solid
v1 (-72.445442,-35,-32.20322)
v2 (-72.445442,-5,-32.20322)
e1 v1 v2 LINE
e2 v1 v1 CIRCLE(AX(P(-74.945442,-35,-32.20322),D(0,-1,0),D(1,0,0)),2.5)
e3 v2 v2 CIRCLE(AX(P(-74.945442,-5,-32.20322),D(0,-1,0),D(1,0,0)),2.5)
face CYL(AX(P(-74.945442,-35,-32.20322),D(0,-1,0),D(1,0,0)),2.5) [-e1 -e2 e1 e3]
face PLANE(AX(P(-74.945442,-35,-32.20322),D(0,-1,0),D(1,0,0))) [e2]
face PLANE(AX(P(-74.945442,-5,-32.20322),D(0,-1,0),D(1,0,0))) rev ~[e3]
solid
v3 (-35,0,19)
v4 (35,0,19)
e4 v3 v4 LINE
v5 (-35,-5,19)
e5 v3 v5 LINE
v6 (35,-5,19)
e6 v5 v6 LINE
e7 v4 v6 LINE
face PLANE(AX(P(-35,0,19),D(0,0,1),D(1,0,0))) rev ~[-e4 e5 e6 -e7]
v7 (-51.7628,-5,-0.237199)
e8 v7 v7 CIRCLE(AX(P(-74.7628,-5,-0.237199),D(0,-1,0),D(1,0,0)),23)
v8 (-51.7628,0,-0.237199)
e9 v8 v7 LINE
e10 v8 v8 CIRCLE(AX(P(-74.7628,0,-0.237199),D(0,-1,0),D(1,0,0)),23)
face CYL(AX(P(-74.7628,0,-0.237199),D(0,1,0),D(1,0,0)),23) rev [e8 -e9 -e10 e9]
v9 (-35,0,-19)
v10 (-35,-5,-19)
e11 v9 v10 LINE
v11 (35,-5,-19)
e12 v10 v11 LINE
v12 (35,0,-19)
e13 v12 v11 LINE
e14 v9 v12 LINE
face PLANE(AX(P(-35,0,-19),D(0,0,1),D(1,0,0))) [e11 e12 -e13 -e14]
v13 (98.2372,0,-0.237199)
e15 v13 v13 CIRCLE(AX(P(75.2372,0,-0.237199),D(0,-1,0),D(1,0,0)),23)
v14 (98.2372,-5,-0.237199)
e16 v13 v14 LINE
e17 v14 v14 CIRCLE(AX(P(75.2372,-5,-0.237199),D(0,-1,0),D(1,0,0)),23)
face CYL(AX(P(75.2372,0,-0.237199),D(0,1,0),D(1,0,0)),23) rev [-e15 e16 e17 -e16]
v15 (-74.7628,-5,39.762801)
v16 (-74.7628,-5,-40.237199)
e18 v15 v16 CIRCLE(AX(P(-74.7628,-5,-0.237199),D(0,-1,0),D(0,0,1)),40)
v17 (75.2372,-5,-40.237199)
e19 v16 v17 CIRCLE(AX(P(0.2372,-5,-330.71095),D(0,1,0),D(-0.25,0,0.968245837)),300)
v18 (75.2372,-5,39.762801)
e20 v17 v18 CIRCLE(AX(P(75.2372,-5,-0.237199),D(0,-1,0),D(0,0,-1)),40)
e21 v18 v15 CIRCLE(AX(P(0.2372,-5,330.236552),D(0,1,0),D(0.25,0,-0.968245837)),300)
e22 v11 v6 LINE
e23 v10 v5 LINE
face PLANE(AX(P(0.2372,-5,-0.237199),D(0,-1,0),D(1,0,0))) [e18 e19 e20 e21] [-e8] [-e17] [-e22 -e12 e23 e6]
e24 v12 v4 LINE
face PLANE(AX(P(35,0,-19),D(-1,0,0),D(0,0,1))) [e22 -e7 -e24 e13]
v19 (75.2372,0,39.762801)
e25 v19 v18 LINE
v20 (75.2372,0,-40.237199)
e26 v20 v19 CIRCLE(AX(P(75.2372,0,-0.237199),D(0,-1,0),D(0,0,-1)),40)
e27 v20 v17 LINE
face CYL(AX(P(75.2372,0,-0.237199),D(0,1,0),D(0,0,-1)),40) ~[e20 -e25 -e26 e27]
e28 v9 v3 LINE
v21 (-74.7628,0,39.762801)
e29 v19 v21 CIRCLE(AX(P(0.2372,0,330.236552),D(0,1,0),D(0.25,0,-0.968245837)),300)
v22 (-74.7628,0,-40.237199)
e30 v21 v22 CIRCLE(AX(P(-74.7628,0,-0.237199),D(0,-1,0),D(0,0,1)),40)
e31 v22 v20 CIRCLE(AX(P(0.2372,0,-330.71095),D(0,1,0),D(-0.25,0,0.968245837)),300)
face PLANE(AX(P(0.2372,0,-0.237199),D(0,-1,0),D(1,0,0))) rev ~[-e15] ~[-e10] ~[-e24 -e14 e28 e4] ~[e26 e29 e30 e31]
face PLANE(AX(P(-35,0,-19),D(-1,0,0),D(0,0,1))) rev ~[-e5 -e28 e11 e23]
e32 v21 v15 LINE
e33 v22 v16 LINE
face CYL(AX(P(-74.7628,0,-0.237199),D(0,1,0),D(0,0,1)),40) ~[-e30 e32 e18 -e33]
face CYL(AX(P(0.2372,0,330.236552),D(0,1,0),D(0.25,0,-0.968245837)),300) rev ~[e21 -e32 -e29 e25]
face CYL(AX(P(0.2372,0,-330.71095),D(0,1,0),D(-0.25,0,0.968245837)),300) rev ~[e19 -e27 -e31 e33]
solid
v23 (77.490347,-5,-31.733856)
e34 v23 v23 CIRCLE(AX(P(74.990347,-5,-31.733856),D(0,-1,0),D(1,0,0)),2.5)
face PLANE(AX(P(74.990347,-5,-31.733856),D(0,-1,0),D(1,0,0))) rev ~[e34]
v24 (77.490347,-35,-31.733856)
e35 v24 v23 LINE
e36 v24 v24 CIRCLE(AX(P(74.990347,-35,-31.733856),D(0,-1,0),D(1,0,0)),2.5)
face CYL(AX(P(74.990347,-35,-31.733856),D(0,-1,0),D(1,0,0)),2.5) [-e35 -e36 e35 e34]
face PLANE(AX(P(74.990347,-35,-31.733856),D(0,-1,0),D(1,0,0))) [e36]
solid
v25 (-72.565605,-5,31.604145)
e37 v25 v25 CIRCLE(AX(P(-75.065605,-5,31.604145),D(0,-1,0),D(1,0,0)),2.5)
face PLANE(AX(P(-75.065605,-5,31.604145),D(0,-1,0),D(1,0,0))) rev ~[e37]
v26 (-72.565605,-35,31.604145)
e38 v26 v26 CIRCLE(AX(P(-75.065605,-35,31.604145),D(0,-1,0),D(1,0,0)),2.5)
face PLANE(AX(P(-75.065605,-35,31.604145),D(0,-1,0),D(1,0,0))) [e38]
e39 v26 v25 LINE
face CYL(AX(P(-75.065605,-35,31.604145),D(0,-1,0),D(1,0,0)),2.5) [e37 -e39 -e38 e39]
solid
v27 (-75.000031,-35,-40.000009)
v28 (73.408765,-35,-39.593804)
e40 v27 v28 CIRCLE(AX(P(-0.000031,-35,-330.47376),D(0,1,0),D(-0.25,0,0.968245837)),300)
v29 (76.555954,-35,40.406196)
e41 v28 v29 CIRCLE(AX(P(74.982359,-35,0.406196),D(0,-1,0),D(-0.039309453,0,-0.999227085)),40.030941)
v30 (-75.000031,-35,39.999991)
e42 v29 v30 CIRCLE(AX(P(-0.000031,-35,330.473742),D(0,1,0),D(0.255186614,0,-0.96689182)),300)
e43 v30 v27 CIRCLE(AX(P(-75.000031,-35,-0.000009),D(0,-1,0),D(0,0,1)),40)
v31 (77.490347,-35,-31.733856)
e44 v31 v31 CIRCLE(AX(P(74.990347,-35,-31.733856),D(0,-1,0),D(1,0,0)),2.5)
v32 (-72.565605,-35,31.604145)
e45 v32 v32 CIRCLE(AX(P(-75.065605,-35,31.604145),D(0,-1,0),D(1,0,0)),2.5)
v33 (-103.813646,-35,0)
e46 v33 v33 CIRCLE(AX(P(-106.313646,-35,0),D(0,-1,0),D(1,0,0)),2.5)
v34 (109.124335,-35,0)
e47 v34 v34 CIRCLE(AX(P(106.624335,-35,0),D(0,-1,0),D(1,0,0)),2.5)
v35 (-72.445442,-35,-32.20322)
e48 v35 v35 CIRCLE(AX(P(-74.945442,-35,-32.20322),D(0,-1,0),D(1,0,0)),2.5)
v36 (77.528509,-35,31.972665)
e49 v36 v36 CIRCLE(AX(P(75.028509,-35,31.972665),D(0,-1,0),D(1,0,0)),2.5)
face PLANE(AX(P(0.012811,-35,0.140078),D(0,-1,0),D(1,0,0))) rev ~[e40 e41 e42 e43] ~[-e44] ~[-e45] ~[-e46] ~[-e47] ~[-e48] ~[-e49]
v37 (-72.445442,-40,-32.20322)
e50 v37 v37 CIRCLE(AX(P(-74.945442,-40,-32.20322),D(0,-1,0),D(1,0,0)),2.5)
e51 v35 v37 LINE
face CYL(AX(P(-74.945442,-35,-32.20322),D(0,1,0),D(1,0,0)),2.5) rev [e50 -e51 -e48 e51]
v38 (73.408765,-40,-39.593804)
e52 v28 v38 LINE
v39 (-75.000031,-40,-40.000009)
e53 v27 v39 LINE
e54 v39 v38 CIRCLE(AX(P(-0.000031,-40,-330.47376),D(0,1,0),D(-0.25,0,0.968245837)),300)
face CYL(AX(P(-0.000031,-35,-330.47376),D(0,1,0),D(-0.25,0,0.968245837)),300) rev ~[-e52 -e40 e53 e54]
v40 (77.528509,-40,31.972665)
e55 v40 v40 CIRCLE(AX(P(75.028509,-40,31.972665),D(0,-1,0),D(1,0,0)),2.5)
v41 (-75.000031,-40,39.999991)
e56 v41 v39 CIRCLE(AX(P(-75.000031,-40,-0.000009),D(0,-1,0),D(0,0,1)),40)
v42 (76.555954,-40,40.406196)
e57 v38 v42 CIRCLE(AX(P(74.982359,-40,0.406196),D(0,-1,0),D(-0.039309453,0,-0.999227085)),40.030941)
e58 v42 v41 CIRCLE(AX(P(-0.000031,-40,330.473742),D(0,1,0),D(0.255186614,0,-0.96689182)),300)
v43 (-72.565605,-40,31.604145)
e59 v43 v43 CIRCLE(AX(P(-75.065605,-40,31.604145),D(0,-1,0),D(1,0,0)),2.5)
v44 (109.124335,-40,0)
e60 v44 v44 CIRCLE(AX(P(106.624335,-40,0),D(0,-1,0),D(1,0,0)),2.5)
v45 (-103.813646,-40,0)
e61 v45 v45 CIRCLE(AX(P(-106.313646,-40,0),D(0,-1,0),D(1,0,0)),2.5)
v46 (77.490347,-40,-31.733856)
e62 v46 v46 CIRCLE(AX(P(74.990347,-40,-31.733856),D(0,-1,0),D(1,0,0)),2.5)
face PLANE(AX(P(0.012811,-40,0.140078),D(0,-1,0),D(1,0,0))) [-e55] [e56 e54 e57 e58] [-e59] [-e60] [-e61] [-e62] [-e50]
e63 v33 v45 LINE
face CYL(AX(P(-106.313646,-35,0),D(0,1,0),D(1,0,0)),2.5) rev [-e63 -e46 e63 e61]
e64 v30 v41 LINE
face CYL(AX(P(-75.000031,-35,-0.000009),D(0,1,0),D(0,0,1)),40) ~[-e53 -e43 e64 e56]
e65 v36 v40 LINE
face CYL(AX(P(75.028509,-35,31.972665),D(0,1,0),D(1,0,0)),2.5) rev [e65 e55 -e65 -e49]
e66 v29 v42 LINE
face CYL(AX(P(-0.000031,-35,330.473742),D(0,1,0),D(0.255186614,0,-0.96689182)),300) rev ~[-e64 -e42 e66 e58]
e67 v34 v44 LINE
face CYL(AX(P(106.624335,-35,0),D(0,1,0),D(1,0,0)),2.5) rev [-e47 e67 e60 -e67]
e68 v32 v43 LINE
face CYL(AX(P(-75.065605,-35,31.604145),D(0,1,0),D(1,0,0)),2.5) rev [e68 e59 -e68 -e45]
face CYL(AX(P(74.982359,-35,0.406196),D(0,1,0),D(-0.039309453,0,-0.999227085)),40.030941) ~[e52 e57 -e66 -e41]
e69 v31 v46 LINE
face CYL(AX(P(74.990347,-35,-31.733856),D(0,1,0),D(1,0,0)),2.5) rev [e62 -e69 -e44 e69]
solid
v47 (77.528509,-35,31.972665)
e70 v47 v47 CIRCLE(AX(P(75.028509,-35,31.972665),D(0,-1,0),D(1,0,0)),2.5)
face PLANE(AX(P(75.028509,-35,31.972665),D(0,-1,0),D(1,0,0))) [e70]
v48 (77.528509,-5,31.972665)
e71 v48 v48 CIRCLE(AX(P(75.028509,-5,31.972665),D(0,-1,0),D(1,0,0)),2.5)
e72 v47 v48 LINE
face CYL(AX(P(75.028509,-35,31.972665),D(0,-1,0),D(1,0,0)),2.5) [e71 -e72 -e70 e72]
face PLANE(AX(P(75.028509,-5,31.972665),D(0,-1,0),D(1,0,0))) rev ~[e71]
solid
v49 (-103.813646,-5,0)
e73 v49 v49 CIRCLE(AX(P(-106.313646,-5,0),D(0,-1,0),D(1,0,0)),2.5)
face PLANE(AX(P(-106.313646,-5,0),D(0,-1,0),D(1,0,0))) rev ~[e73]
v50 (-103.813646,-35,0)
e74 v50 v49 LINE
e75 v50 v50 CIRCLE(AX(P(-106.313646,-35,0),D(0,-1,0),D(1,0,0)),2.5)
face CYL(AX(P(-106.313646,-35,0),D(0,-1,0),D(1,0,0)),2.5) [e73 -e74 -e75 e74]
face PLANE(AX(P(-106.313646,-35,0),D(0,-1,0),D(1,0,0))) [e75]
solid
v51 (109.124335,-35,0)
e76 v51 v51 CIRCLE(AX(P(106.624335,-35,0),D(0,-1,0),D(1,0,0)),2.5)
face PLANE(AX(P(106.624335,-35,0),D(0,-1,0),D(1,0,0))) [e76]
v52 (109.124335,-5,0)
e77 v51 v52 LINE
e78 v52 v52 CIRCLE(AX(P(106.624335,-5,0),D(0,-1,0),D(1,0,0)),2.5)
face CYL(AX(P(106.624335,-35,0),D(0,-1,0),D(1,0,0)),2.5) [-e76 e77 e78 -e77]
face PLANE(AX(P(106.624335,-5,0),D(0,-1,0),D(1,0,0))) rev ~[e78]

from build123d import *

# Parameters (mm, degrees)
F0_R     = 23
F0_W     = 70
F0_H     = 38
F1_DEPTH = 5
F3_R     = 2.5
F4_DEPTH = 5
F5_DEPTH = 30


with BuildPart() as f1:
    # F0 (on Front) → F1 (new body)
    with BuildSketch(Plane.XZ):
        with BuildLine():
            ThreePointArc((-74.7628004057, -40.2371987939), (0.2371995943, -30.7109497595), (75.2371995943, -40.2371987939))
            ThreePointArc((75.2371995943, -40.2371987939), (115.2371995943, -0.2371987939), (75.2371995943, 39.7628012061))
            ThreePointArc((75.2371995943, 39.7628012061), (0.2371995943, 30.2365521716), (-74.7628004057, 39.7628012061))
            ThreePointArc((-74.7628004057, 39.7628012061), (-114.7628004057, -0.2371987939), (-74.7628004057, -40.2371987939))
        make_face()
        with Locations((75.2371995943, -0.2371987939)):
            Circle(F0_R, mode=Mode.SUBTRACT)
        with Locations((-74.7628004057, -0.2371987939)):
            Circle(F0_R, mode=Mode.SUBTRACT)
        Rectangle(F0_W, F0_H, mode=Mode.SUBTRACT)
    extrude(amount=F1_DEPTH)


with BuildPart() as f4:
    # F3 (on offset) → F4 (new body)
    with BuildSketch(Plane.XZ.offset(35)):
        with BuildLine():
            ThreePointArc((-75.0000307412, -40.0000089742), (-0.8211479846, -30.4748836644), (73.4087647878, -39.593804049))
            ThreePointArc((73.4087647878, -39.593804049), (114.9823591797, -1.1673984409), (76.5559535716, 40.406195951))
            ThreePointArc((76.5559535716, 40.406195951), (0.8040354288, 30.4748195307), (-75.0000307412, 39.9999910258))
            ThreePointArc((-75.0000307412, 39.9999910258), (-115.0000307412, -8.9742e-06), (-75.0000307412, -40.0000089742))
        make_face()
        with Locations((-74.9454423785, -32.203219831)):
            Circle(F3_R, mode=Mode.SUBTRACT)
        with Locations((-106.3136458397, 0)):
            Circle(F3_R, mode=Mode.SUBTRACT)
        with Locations((74.9903470278, -31.7338556051)):
            Circle(F3_R, mode=Mode.SUBTRACT)
        with Locations((106.6243350506, 0)):
            Circle(F3_R, mode=Mode.SUBTRACT)
        with Locations((-75.0656053424, 31.6041447222)):
            Circle(F3_R, mode=Mode.SUBTRACT)
        with Locations((75.0285089016, 31.9726653397)):
            Circle(F3_R, mode=Mode.SUBTRACT)
    extrude(amount=F4_DEPTH)


with BuildPart() as f5:
    # F3 (on offset) → F5 (new body)
    with BuildSketch(Plane.XZ.offset(35)):
        with Locations((-75.0656053424, 31.6041447222)):
            Circle(F3_R)
    extrude(amount=-F5_DEPTH)


with BuildPart() as f5b:
    # F3 (on offset) → F5, piece 2 (new body)
    with BuildSketch(Plane.XZ.offset(35)):
        with Locations((-106.3136458397, 0)):
            Circle(F3_R)
    extrude(amount=-F5_DEPTH)


with BuildPart() as f5c:
    # F3 (on offset) → F5, piece 3 (new body)
    with BuildSketch(Plane.XZ.offset(35)):
        with Locations((-74.9454423785, -32.203219831)):
            Circle(F3_R)
    extrude(amount=-F5_DEPTH)


with BuildPart() as f5d:
    # F3 (on offset) → F5, piece 4 (new body)
    with BuildSketch(Plane.XZ.offset(35)):
        with Locations((75.0285089016, 31.9726653397)):
            Circle(F3_R)
    extrude(amount=-F5_DEPTH)


with BuildPart() as f5e:
    # F3 (on offset) → F5, piece 5 (new body)
    with BuildSketch(Plane.XZ.offset(35)):
        with Locations((106.6243350506, 0)):
            Circle(F3_R)
    extrude(amount=-F5_DEPTH)


with BuildPart() as f5f:
    # F3 (on offset) → F5, piece 6 (new body)
    with BuildSketch(Plane.XZ.offset(35)):
        with Locations((74.9903470278, -31.7338556051)):
            Circle(F3_R)
    extrude(amount=-F5_DEPTH)


solid = Compound([f1.part, f4.part, f5.part, f5b.part, f5c.part, f5d.part, f5e.part, f5f.part])
